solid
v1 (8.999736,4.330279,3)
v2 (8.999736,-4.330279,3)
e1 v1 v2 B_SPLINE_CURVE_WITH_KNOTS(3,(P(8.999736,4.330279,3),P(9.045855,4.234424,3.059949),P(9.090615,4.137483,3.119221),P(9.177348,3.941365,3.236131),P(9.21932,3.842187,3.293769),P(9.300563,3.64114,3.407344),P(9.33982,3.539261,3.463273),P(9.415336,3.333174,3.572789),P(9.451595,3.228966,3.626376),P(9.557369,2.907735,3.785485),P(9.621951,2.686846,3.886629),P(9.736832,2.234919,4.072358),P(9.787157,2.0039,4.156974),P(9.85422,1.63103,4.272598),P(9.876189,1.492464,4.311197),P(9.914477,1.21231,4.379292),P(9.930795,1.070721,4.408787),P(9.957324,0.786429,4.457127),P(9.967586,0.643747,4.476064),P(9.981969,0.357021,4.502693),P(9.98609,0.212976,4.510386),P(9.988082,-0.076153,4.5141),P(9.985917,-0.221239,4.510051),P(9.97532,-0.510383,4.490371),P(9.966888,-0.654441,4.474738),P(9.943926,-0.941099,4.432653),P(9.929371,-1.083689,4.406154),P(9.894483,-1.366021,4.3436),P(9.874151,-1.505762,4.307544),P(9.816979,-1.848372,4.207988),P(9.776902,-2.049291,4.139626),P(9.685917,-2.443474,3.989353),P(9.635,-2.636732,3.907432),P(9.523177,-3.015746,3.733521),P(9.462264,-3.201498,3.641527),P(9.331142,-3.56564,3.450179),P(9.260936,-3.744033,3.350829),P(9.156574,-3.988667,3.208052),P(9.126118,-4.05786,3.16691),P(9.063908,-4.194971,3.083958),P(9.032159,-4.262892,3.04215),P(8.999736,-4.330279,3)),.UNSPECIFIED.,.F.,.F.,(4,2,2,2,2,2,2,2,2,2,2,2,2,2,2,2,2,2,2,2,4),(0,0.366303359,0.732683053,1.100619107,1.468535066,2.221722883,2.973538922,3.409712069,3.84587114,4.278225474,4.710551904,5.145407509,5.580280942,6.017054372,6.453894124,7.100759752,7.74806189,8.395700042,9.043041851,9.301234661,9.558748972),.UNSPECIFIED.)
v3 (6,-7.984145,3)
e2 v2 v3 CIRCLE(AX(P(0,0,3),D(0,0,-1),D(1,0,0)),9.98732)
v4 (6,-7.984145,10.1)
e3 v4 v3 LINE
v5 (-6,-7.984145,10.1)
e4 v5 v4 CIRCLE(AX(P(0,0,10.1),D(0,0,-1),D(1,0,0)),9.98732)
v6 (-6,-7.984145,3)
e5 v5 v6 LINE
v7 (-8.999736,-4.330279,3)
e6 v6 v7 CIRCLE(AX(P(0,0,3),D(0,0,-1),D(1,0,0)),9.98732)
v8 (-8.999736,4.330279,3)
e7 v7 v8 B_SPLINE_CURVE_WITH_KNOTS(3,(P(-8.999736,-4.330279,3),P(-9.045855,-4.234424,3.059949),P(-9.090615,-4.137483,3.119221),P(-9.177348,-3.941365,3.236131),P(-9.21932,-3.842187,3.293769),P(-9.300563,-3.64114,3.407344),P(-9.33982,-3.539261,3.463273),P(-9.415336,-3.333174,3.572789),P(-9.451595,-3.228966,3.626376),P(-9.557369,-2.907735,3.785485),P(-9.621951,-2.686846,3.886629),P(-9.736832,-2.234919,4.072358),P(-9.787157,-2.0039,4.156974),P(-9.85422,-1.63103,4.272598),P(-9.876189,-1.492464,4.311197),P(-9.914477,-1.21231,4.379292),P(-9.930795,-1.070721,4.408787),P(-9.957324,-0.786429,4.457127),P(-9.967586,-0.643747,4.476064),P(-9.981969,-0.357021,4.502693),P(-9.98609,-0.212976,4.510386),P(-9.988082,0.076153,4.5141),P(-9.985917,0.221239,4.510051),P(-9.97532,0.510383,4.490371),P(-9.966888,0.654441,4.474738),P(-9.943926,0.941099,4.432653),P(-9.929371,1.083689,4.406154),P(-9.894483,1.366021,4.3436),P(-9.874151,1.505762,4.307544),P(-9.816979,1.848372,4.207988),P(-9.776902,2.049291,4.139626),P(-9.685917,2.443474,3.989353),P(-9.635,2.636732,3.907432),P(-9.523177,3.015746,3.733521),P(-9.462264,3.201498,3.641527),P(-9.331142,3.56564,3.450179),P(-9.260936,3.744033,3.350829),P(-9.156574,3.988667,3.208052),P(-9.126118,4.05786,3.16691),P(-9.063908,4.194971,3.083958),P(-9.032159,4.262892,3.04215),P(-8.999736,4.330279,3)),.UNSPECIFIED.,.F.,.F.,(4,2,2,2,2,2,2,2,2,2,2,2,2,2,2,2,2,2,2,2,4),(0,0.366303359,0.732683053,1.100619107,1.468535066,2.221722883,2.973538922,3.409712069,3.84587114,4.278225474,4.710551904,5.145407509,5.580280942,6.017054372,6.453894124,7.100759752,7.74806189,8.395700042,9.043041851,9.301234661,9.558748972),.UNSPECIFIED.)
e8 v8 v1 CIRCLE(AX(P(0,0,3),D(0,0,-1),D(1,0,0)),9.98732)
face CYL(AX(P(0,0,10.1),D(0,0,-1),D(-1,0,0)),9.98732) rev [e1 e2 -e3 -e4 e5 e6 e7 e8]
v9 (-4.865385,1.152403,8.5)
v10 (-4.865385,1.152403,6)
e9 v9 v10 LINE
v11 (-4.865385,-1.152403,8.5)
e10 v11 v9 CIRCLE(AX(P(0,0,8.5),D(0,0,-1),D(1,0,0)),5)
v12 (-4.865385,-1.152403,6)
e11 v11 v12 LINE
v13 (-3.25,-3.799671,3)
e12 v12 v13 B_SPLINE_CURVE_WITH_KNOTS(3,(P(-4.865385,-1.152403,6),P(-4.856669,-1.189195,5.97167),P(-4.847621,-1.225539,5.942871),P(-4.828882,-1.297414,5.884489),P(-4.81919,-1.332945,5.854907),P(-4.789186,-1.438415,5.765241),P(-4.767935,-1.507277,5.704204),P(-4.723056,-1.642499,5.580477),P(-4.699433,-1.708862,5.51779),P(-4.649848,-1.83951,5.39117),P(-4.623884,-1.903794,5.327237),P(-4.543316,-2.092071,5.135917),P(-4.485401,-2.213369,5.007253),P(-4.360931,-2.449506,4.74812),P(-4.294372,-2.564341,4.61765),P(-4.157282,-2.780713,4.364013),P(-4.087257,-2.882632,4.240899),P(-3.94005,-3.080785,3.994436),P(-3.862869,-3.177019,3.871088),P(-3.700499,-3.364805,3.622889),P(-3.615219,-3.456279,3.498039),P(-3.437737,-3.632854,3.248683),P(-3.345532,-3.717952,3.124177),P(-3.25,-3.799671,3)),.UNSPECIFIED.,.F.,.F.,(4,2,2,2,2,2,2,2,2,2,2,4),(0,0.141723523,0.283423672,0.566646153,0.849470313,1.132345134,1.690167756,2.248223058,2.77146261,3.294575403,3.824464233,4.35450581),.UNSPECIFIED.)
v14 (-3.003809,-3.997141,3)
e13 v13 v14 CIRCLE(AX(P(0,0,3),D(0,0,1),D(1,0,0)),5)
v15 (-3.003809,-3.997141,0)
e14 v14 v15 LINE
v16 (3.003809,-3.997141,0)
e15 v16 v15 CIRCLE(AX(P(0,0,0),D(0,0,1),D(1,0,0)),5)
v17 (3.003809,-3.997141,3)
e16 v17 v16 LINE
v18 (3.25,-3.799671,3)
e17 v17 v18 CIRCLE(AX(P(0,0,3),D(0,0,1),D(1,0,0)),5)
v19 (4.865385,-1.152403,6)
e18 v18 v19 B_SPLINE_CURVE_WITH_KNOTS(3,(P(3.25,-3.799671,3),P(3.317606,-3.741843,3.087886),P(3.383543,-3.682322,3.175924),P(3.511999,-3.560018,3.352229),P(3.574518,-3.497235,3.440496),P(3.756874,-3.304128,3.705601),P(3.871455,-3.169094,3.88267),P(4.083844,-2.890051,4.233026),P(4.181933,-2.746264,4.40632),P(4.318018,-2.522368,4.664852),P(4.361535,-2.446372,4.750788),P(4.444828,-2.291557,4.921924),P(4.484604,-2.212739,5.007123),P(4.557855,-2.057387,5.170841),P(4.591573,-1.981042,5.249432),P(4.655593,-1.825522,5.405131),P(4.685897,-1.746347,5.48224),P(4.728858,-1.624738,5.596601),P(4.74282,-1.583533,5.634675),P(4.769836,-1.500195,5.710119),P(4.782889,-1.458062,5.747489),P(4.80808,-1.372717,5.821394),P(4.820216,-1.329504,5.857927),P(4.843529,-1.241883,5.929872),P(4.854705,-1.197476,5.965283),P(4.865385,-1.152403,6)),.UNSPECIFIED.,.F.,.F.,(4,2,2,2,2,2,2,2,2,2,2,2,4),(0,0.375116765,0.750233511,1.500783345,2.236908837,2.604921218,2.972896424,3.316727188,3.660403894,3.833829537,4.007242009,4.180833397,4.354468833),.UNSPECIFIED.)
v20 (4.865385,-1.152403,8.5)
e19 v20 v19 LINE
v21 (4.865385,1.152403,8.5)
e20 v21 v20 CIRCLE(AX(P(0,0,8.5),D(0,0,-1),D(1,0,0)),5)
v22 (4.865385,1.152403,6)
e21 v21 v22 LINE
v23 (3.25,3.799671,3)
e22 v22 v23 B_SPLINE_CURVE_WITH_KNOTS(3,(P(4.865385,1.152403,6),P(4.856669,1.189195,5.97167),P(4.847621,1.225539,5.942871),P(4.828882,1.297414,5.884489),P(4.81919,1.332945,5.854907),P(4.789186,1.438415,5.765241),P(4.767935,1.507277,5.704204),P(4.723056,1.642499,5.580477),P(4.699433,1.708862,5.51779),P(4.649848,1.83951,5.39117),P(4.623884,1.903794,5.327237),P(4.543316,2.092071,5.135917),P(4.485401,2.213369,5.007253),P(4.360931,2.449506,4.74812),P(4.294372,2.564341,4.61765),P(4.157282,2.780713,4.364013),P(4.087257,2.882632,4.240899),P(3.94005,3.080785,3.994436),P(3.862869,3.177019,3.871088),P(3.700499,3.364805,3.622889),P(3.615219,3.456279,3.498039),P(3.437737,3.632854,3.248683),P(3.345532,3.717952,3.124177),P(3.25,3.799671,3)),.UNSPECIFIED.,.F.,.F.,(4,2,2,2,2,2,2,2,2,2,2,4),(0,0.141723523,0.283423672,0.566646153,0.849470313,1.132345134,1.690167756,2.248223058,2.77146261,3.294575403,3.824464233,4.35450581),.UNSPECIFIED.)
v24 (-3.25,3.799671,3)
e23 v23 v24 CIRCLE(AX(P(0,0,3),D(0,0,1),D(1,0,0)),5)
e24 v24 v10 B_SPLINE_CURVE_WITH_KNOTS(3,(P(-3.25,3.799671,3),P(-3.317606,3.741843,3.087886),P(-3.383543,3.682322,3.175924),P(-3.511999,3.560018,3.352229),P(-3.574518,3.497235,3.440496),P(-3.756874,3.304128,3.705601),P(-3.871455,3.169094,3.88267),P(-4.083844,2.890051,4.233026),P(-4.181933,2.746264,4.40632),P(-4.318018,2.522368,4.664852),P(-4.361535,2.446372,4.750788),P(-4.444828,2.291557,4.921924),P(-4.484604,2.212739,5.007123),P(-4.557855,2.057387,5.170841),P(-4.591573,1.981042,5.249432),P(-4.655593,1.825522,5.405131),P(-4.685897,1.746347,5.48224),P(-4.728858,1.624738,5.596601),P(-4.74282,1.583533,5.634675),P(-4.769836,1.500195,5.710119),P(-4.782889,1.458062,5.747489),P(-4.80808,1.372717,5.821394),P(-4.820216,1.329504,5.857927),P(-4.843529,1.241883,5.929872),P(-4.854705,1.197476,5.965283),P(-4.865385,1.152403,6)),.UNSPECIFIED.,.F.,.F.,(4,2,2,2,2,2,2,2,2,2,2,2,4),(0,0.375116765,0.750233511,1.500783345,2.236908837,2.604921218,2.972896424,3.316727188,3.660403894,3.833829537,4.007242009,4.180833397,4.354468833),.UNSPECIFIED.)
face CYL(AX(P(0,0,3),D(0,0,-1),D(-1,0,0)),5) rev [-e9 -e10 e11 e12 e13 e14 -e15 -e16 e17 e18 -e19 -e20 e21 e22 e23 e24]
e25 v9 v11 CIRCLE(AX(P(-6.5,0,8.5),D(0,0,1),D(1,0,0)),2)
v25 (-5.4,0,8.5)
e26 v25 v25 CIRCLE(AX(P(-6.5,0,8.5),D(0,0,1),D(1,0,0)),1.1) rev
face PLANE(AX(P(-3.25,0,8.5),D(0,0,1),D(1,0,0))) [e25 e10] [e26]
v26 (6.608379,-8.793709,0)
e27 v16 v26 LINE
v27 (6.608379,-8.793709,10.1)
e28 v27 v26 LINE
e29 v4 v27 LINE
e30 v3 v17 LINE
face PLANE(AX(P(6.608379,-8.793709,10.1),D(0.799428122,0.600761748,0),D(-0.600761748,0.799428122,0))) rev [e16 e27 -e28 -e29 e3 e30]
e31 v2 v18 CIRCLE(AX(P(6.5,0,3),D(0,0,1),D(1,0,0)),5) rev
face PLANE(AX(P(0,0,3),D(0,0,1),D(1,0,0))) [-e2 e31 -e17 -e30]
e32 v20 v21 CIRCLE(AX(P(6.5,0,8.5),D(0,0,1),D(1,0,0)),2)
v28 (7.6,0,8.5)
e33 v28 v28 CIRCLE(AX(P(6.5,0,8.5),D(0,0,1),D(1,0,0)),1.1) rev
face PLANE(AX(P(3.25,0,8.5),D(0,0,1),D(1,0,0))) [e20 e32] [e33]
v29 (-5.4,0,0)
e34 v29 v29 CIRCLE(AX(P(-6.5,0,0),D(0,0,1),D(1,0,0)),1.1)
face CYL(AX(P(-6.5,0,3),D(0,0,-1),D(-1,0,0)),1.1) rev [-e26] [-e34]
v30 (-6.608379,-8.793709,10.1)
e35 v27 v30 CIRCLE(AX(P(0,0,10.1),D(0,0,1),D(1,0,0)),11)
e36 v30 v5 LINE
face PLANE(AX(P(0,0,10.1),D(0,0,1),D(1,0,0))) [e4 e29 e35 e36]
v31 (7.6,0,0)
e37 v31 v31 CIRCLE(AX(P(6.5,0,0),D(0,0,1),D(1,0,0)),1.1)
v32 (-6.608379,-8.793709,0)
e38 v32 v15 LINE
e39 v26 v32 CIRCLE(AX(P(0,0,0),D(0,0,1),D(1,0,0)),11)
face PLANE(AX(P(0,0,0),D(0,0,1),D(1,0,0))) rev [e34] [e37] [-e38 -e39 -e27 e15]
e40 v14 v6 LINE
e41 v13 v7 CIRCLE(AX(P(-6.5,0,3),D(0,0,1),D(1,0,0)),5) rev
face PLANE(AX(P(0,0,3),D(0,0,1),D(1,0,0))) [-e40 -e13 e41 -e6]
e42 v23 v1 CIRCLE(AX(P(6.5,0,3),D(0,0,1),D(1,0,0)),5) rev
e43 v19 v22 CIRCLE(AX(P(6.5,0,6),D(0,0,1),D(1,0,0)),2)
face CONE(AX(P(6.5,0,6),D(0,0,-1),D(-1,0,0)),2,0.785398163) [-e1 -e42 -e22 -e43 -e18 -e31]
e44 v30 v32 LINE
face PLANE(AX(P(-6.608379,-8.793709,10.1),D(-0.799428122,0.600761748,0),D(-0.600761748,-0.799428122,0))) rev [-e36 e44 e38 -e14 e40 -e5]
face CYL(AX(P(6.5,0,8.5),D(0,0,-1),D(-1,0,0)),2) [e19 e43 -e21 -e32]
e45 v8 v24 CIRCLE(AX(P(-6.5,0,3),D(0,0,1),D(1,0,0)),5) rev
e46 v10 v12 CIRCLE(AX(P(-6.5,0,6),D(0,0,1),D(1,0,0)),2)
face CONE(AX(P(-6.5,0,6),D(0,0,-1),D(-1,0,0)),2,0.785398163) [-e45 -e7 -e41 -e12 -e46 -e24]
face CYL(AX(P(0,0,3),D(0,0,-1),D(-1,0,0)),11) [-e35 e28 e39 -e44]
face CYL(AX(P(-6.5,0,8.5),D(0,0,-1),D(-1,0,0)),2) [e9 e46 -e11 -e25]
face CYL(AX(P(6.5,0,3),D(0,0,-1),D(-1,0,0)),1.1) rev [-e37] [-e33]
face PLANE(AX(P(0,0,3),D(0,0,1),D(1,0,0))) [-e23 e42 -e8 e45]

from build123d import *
from build123d.topology import SkipClean

# Parameters (mm, degrees)
SKETCH_1_R          = 11
SKETCH_1_R_2        = 5
SKETCH_1_R_3        = 1.1
EXTRUDE_1_DEPTH     = 3
EXTRUDE_2_DEPTH     = 5.5
EXTRUDE_3_DEPTH     = 7.1
CHAMFER_1_SIZE      = 3
CUT_EXTRUDE_1_DEPTH = 10
CUT_EXTRUDE_2_REACH = 19.1
SKETCH_5_R          = 1.1


with BuildPart() as part:
    # 草图1 → 凸台-拉伸1 (new body)
    with BuildSketch(Plane.XY):
        Circle(SKETCH_1_R)
        Circle(SKETCH_1_R_2, mode=Mode.SUBTRACT)
        with Locations((-6.5, 0)):
            Circle(SKETCH_1_R_3, mode=Mode.SUBTRACT)
        with Locations((6.5, 0)):
            Circle(SKETCH_1_R_3, mode=Mode.SUBTRACT)
    extrude(amount=EXTRUDE_1_DEPTH)

    # 草图2 → 凸台-拉伸2 (add)
    with SkipClean():  # the faces are left unmerged after this step: merging them gives an invalid solid
        with BuildSketch(Plane.XY.offset(3)):
            with BuildLine():
                ThreePointArc((4.865384615, -1.152402944), (8.5, 0), (4.865384615, 1.152402944))
                ThreePointArc((4.865384615, 1.152402944), (5, 0), (4.865384615, -1.152402944))
            make_face()
            with BuildLine():
                ThreePointArc((-4.865384615, 1.152402944), (-8.5, 0), (-4.865384615, -1.152402944))
                ThreePointArc((-4.865384615, -1.152402944), (-5, 0), (-4.865384615, 1.152402944))
            make_face()
        extrude(amount=EXTRUDE_2_DEPTH)

    # 草图3 → 凸台-拉伸3 (add)
    with SkipClean():  # the faces are left unmerged after this step: merging them gives an invalid solid
        with BuildSketch(Plane.XY.offset(3)):
            with BuildLine():
                Line((-6.60837923, -8.79370934), (-6, -7.984144705))
                ThreePointArc((-6, -7.984144705), (0, 9.987320295), (6, -7.984144705))
                Line((6, -7.984144705), (6.60837923, -8.79370934))
                ThreePointArc((6.60837923, -8.79370934), (0, 11), (-6.60837923, -8.79370934))
            make_face()
        extrude(amount=EXTRUDE_3_DEPTH)

    # 倒角1
    # the kernel refuses this chamfer: 3 mm, written as the material it adds along each edge
    with BuildSketch(Plane(origin=(6.5, 0, 3), x_dir=(-0.9999950652018583, -0.0031415874858795587, 0), z_dir=(-0.0031415874858795587, 0.9999950652018583, 0))) as chamfer_1_piece_1_section:
        Polygon((2 + CHAMFER_1_SIZE, 0), (2, CHAMFER_1_SIZE), (2, 0), align=None)
    chamfer_1_piece_1 = revolve(axis=Axis((6.5, 0, 3), (0, 0, 1)), revolution_arc=359.64, mode=Mode.PRIVATE)
    chamfer_1_piece_1 = chamfer_1_piece_1 - Plane(origin=(0, 0, 3.47273438), x_dir=(1, 0, 0), z_dir=(0, 0, -1)) * Cylinder(5, 21, mode=Mode.PRIVATE)
    chamfer_1_piece_1 = chamfer_1_piece_1 & Plane(origin=(0, 0, 3.47273438), x_dir=(-0.6007617481958082, -0.7994281217875167, 0), z_dir=(0, 0, -1)) * Cylinder(9.987320295, 21, mode=Mode.PRIVATE)
    add(chamfer_1_piece_1)
    with BuildSketch(Plane(origin=(-6.5, 0, 3), x_dir=(0.9999950652018583, 0.0031415874858795045, 0), z_dir=(0.0031415874858795045, -0.9999950652018583, 0))) as chamfer_1_piece_2_section:
        Polygon((2 + CHAMFER_1_SIZE, 0), (2, CHAMFER_1_SIZE), (2, 0), align=None)
    chamfer_1_piece_2 = revolve(axis=Axis((-6.5, 0, 3), (0, 0, 1)), revolution_arc=359.64, mode=Mode.PRIVATE)
    chamfer_1_piece_2 = chamfer_1_piece_2 - Plane(origin=(0, 0, 3.472734386), x_dir=(1, 0, 0), z_dir=(0, 0, -1)) * Cylinder(5, 21, mode=Mode.PRIVATE)
    chamfer_1_piece_2 = chamfer_1_piece_2 & Plane(origin=(0, 0, 3.472734386), x_dir=(-0.6007617481958082, -0.7994281217875167, 0), z_dir=(0, 0, -1)) * Cylinder(9.987320295, 21, mode=Mode.PRIVATE)
    add(chamfer_1_piece_2)

    # 草图4 → 切除-拉伸1 (cut)
    with BuildSketch(Plane(origin=(0, 0, 0), x_dir=(-1, 0, 0), z_dir=(0, 0, -1))):
        with BuildLine():
            ThreePointArc((-6.60837923, -8.79370934), (0, -11), (6.60837923, -8.79370934))
            Line((6.60837923, -8.79370934), (3.003808741, -3.997140609))
            ThreePointArc((3.003808741, -3.997140609), (0, -5), (-3.003808741, -3.997140609))
            Line((-3.003808741, -3.997140609), (-6.60837923, -8.79370934))
        make_face()
    extrude(amount=-CUT_EXTRUDE_1_DEPTH, mode=Mode.SUBTRACT)

    # 草图5 → 切除-拉伸2 (cut, up to next)
    with BuildSketch(Plane(origin=(0, 0, 3), x_dir=(-1, 0, 0), z_dir=(0, 0, -1)), mode=Mode.PRIVATE) as cut_extrude_2_sk1:
        with Locations(Location((6.5, 0, 0), (0, 0, 180))):
            Circle(SKETCH_5_R)
    cut_extrude_2_tool1 = extrude(cut_extrude_2_sk1.sketch, amount=-CUT_EXTRUDE_2_REACH, mode=Mode.PRIVATE) & part.part
    # 草图5 → 切除-拉伸2 (cut, up to next)
    with BuildSketch(Plane(origin=(0, 0, 3), x_dir=(-1, 0, 0), z_dir=(0, 0, -1)), mode=Mode.PRIVATE) as cut_extrude_2_sk2:
        with Locations(Location((-6.5, 0, 0), (0, 0, 180))):
            Circle(SKETCH_5_R)
    cut_extrude_2_tool2 = extrude(cut_extrude_2_sk2.sketch, amount=-CUT_EXTRUDE_2_REACH, mode=Mode.PRIVATE) & part.part
    add(cut_extrude_2_tool1.solids().sort_by_distance((-6.5, 0, 3))[0], mode=Mode.SUBTRACT)
    add(cut_extrude_2_tool2.solids().sort_by_distance((6.5, 0, 3))[0], mode=Mode.SUBTRACT)


solid = part.part
